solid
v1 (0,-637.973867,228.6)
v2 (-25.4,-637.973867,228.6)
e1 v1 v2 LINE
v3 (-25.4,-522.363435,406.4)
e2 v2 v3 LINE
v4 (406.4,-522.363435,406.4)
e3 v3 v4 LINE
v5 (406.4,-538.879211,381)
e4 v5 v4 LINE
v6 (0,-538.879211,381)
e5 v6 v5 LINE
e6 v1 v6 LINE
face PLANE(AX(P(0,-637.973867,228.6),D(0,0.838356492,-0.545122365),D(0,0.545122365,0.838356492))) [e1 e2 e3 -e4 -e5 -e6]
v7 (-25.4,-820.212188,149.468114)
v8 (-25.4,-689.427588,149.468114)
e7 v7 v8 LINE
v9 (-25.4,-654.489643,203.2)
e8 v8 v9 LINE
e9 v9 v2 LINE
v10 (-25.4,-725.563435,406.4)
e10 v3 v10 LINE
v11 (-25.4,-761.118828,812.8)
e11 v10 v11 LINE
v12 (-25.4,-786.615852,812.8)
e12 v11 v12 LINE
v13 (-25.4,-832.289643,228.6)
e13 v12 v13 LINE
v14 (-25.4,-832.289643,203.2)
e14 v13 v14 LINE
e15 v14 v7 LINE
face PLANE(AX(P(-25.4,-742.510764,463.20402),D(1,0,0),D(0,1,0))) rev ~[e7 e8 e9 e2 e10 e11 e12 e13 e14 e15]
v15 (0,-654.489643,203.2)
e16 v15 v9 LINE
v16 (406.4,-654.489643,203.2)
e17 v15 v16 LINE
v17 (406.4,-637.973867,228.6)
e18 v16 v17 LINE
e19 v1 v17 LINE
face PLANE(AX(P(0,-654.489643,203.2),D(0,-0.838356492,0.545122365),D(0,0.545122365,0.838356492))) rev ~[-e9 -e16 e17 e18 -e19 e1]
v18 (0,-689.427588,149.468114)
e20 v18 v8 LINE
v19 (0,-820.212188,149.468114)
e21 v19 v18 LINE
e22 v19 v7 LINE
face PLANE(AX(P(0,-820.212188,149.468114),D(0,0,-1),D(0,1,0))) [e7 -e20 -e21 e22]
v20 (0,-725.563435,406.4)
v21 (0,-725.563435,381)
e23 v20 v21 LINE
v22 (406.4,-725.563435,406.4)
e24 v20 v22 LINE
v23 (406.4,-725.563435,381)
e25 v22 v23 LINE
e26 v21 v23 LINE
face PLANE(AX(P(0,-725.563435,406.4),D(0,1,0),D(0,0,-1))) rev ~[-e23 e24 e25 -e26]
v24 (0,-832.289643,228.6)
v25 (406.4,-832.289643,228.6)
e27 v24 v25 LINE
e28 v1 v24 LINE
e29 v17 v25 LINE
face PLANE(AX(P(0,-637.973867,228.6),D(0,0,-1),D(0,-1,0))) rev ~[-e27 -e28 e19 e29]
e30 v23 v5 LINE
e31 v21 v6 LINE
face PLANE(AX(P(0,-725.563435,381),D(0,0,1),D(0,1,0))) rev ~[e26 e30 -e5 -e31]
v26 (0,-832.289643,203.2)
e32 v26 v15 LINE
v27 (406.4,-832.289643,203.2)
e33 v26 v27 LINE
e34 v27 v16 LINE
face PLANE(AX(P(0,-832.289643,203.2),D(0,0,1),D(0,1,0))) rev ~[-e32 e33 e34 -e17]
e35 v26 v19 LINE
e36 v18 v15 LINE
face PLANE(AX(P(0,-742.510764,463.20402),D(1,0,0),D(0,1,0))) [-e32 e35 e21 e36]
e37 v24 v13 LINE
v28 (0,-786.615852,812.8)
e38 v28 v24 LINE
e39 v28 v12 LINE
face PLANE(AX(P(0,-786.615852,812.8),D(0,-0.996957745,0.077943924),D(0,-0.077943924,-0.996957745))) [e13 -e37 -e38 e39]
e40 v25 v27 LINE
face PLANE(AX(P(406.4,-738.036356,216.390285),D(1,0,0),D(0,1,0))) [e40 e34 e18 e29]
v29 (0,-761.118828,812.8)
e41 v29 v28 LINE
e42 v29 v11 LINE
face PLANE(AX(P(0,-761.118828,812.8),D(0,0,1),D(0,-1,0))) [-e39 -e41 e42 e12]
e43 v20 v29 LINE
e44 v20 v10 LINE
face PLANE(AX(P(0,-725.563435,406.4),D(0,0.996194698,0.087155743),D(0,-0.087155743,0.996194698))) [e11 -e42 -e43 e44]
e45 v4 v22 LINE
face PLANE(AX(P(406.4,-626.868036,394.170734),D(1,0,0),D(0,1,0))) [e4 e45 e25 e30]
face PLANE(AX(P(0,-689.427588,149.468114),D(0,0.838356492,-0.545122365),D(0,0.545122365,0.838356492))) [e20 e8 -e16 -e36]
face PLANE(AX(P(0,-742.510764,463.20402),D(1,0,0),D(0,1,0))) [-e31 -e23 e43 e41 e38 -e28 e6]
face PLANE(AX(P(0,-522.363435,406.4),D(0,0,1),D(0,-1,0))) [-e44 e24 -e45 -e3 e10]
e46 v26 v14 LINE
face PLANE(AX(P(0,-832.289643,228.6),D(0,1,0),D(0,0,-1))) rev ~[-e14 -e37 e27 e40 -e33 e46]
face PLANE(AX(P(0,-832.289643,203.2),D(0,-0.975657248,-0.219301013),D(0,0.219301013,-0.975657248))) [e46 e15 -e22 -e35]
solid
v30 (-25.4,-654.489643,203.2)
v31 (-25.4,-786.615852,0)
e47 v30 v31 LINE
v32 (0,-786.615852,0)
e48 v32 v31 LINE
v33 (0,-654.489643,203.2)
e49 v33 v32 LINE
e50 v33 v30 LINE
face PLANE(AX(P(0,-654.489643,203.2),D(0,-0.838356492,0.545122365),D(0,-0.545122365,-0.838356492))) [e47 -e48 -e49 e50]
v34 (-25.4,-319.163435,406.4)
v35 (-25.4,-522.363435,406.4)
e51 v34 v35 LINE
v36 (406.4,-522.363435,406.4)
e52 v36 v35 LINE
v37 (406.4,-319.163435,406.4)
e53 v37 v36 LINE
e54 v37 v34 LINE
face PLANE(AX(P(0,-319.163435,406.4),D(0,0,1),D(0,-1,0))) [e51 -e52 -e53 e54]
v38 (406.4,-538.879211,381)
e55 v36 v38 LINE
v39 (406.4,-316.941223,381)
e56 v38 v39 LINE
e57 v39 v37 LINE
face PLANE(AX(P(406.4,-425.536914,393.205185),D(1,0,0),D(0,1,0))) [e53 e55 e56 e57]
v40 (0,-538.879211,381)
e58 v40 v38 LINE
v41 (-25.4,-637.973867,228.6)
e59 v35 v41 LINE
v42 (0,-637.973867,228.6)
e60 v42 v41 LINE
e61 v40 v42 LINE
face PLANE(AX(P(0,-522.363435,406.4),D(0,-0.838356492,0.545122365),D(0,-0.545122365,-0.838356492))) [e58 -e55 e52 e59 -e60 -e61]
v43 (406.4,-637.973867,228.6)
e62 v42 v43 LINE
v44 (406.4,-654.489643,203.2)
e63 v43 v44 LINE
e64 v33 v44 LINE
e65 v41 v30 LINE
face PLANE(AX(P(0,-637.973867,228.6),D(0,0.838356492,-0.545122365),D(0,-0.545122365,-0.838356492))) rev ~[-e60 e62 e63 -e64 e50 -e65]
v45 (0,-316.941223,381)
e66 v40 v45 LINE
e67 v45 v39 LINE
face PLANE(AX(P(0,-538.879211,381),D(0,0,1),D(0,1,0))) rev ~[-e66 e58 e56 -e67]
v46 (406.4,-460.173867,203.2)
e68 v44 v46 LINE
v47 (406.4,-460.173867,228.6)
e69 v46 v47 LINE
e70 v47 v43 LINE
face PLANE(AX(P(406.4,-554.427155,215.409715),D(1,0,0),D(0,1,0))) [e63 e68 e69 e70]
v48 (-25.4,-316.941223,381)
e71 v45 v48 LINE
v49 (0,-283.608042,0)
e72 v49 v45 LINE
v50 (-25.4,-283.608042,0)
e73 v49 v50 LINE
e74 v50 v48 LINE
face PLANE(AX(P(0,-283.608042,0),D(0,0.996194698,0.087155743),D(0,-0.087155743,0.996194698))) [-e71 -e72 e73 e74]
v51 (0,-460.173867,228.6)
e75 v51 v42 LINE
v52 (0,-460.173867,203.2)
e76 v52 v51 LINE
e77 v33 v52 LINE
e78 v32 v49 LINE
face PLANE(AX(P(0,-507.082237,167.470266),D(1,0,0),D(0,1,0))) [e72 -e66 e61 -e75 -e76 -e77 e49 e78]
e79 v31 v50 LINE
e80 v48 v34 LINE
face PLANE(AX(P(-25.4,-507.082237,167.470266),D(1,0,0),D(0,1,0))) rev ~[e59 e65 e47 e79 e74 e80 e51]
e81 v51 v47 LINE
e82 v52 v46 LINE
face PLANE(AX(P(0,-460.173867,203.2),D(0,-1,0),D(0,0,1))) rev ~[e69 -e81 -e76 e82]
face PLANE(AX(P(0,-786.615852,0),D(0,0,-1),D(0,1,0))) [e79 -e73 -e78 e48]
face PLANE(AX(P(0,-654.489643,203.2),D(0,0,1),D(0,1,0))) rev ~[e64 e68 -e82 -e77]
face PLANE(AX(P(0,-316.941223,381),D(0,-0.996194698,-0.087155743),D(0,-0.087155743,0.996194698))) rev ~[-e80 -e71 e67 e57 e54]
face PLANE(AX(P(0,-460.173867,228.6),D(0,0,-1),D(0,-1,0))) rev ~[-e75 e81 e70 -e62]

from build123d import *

# Parameters (mm, degrees)
F1_DEPTH = 25.4
F2_DEPTH = 25.4
F3_DEPTH = 406.4
F4_DEPTH = 406.4


with BuildPart() as f1:
    # F0 (on Right) → F1 (new body)
    with BuildSketch(Plane.YZ):
        Polygon((-637.9738673686, 228.6), (-538.8792110946, 381), (-725.5634350489, 381), (-748.838246869, 381), (-786.6158517795, 812.8), (-832.2896434142, 228.6), align=None)
        Polygon((-725.5634350489, 381), (-538.8792110946, 381), (-522.3634350489, 406.4), (-725.5634350489, 406.4), align=None)
        Polygon((-820.2121879405, 149.4681142857), (-689.4275879405, 149.4681142857), (-654.4896434142, 203.2), (-832.2896434142, 203.2), align=None)
        Polygon((-654.4896434142, 203.2), (-637.9738673686, 228.6), (-832.2896434142, 228.6), (-832.2896434142, 203.2), align=None)
        Polygon((-748.838246869, 381), (-725.5634350489, 381), (-725.5634350489, 406.4), (-761.1188279059, 812.8), (-786.6158517795, 812.8), align=None)
    extrude(amount=-F1_DEPTH)

    # F0 (on Right) → F3 (join)
    with BuildSketch(Plane.YZ):
        Polygon((-654.4896434142, 203.2), (-637.9738673686, 228.6), (-832.2896434142, 228.6), (-832.2896434142, 203.2), align=None)
        Polygon((-725.5634350489, 381), (-538.8792110946, 381), (-522.3634350489, 406.4), (-725.5634350489, 406.4), align=None)
    extrude(amount=F3_DEPTH)


with BuildPart() as f2:
    # F0 (on Right) → F2 (new body)
    with BuildSketch(Plane.YZ):
        Polygon((-319.1634350489, 0), (-283.608042192, 0), (-316.9412229954, 381), (-538.8792110946, 381), (-637.9738673686, 228.6), (-460.1738673686, 228.6), (-460.1738673686, 203.2), (-654.4896434142, 203.2), (-689.4275879405, 149.4681142857), (-786.6158517795, 0), align=None)
        Polygon((-538.8792110946, 381), (-316.9412229954, 381), (-319.1634350489, 406.4), (-522.3634350489, 406.4), align=None)
        Polygon((-460.1738673686, 228.6), (-637.9738673686, 228.6), (-654.4896434142, 203.2), (-460.1738673686, 203.2), align=None)
    extrude(amount=-F2_DEPTH)

    # F0 (on Right) → F4 (join)
    with BuildSketch(Plane.YZ):
        Polygon((-460.1738673686, 228.6), (-637.9738673686, 228.6), (-654.4896434142, 203.2), (-460.1738673686, 203.2), align=None)
        Polygon((-538.8792110946, 381), (-316.9412229954, 381), (-319.1634350489, 406.4), (-522.3634350489, 406.4), align=None)
    extrude(amount=F4_DEPTH)


solid = Compound([f1.part, f2.part])
